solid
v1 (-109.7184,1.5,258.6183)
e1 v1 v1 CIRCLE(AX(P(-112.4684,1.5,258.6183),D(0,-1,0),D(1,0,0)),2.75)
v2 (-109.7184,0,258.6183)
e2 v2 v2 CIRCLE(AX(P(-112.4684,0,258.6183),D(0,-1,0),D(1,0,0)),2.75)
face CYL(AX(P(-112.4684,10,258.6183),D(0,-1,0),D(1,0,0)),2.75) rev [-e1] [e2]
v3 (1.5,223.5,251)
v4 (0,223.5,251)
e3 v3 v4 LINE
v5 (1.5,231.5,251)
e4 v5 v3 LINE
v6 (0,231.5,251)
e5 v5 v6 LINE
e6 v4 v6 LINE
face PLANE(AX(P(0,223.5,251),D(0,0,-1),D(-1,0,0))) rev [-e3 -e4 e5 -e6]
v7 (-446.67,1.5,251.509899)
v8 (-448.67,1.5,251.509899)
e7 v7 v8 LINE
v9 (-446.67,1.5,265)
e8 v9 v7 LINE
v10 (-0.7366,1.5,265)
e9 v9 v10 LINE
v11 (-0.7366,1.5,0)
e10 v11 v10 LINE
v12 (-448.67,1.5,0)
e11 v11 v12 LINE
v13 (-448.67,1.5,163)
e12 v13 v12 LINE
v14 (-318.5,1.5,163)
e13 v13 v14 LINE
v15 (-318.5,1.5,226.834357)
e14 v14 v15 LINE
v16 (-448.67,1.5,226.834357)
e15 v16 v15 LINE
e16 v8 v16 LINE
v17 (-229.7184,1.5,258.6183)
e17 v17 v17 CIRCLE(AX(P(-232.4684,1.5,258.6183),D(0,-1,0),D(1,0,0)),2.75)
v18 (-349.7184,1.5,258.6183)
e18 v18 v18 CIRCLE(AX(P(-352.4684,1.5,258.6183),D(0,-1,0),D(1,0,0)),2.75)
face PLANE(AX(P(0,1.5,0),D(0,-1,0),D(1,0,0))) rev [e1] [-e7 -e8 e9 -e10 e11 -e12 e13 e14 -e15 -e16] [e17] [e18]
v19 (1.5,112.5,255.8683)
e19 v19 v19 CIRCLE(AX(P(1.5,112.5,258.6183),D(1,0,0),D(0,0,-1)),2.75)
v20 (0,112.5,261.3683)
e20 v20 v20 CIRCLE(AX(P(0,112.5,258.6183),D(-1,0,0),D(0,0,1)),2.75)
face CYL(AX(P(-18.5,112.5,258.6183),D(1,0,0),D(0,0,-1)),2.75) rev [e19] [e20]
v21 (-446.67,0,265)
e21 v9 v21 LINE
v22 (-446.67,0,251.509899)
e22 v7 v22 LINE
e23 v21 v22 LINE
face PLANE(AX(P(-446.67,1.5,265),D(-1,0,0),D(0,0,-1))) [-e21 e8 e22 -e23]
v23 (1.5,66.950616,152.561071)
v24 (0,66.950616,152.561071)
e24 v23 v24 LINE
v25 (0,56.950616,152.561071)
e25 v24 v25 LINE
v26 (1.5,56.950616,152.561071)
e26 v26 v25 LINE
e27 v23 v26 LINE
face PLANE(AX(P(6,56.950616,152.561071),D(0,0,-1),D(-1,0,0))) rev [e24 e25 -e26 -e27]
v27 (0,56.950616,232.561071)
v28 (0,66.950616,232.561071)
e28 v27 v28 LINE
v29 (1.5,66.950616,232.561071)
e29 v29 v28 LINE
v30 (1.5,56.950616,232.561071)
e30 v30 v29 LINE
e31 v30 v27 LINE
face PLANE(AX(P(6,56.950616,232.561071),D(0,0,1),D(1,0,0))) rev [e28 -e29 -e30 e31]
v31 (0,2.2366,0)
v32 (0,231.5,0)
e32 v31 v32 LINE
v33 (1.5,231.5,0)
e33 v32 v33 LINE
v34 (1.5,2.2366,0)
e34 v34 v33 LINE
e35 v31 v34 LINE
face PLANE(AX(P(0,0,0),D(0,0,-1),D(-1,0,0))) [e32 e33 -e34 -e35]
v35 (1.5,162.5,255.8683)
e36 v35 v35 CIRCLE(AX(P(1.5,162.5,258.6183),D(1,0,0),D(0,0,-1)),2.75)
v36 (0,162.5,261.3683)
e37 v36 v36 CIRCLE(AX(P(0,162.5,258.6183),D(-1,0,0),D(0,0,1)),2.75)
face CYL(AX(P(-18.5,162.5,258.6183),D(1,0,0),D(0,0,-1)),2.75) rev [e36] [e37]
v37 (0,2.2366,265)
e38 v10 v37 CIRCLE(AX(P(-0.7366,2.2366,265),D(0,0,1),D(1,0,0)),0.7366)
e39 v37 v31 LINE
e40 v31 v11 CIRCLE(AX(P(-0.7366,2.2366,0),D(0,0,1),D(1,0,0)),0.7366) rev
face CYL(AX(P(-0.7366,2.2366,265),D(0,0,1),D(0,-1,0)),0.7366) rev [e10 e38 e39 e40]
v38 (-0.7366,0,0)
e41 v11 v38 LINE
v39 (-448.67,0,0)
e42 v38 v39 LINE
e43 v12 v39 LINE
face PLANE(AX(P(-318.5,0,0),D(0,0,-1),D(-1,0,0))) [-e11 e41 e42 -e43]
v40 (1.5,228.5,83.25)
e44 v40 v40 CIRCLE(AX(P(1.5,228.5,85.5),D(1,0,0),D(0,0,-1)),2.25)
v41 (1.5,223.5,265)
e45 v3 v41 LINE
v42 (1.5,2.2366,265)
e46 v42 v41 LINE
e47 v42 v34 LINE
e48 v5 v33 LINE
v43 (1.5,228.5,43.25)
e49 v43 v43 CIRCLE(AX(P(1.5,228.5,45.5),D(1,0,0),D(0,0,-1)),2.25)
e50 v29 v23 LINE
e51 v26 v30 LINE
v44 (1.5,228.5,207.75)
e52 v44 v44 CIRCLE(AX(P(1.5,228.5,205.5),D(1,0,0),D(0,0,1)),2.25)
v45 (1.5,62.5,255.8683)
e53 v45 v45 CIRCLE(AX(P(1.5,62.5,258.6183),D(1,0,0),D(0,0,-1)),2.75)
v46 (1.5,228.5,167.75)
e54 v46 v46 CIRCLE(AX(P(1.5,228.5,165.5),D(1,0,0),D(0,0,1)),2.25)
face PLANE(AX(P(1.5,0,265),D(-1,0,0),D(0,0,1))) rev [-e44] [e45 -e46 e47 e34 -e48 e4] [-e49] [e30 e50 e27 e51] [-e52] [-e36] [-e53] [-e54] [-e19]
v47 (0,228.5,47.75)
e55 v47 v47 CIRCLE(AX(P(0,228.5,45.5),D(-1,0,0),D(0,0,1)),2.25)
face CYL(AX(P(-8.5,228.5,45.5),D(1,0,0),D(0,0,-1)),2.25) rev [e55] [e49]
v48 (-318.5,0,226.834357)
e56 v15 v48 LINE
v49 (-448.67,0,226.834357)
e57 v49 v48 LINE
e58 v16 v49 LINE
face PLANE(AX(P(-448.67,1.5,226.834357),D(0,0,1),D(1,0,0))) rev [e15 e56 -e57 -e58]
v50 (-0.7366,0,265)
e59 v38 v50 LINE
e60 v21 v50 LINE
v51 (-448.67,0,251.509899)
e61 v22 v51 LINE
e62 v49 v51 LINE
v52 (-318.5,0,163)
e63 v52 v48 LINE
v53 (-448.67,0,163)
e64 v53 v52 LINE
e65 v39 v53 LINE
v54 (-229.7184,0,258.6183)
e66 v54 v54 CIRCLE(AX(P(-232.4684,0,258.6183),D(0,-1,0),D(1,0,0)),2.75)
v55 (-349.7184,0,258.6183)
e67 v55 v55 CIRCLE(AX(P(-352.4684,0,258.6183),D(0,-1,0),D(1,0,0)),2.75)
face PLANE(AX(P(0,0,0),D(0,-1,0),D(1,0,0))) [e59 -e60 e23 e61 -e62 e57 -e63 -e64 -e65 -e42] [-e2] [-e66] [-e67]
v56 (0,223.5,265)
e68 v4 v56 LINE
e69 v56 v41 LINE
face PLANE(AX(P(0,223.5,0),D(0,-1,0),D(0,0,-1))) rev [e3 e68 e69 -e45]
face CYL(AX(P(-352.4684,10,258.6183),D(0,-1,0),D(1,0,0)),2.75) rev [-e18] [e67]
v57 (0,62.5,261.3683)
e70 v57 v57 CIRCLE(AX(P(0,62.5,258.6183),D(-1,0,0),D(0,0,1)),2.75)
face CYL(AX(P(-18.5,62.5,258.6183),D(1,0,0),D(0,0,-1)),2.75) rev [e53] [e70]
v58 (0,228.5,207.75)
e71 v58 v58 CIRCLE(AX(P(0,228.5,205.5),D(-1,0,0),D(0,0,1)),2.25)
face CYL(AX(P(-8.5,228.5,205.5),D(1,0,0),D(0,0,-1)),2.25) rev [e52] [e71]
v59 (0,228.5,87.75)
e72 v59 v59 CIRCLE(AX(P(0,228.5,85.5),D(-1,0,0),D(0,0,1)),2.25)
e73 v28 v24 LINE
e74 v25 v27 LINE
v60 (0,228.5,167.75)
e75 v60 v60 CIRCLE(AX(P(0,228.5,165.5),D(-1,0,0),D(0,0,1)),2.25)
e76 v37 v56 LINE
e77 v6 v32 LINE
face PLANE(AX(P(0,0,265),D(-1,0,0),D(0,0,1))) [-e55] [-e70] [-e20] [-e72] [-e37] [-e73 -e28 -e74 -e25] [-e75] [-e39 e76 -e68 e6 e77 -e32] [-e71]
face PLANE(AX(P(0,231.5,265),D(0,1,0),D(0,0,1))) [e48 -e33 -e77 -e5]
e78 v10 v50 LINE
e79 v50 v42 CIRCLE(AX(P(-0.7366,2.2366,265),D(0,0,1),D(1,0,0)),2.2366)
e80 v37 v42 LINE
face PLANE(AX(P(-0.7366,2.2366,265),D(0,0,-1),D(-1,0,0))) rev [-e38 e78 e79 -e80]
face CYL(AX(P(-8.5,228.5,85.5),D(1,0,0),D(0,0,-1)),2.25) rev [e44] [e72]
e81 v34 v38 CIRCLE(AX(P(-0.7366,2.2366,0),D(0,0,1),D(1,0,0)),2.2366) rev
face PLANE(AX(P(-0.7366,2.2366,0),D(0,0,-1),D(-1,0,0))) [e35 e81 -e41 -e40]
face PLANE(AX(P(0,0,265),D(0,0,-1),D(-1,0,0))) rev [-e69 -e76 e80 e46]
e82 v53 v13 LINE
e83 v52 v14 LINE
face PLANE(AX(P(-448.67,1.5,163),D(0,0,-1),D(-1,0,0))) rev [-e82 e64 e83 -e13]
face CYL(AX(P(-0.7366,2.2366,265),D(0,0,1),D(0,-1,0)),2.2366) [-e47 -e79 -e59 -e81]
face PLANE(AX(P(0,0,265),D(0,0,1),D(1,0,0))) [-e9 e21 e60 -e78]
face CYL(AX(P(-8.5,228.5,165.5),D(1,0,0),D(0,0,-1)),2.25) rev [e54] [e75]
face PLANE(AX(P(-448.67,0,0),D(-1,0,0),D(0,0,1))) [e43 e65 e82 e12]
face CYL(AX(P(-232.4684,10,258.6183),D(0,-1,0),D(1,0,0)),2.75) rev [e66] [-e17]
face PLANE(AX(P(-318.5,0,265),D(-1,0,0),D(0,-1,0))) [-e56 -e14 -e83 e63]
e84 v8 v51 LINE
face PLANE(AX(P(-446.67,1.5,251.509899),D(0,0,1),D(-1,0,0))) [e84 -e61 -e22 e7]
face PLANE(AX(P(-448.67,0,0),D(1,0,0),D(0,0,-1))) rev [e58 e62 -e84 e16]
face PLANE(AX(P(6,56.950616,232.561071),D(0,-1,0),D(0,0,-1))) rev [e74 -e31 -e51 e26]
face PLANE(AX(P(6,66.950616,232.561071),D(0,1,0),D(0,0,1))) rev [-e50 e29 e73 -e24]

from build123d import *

# Parameters (mm, degrees)
SKETCH_2_W                       = 1.5
SKETCH_2_H                       = 231.5
SM_BASE_FLANGE_1_DEPTH           = 265
SKETCH_3_W                       = 2.488275725
SKETCH_3_H                       = 14
CUT_EXTRUDE_1_DEPTH              = 8
SKETCH_4_W                       = 80
SKETCH_4_H                       = 10
CUT_EXTRUDE_2_DEPTH              = 6
SM_EDGE_FLANGE_1_STRIP_W         = 7.4732
SM_EDGE_FLANGE_1_STRIP_H         = 1.5
SM_EDGE_FLANGE_1_STRIP_CUT_DEPTH = 265
SM_EDGE_FLANGE_1_DEPTH           = 265
SKETCH_10_W                      = 163
SKETCH_10_H                      = 1.5
EXTRUDE_1_DEPTH                  = 130.17
SKETCH_11_W                      = 38.16564302
SKETCH_11_H                      = 1.5
EXTRUDE_2_DEPTH                  = 130.17
SKETCH_12_R                      = 2.75
CUT_EXTRUDE_3_DEPTH              = 20
SKETCH_13_R                      = 2.75
CUT_EXTRUDE_4_DEPTH              = 10
SKETCH_14_W                      = 13.490100929
SKETCH_14_H                      = 1.5
CUT_EXTRUDE_5_DEPTH              = 2
SKETCH_15_R                      = 2.25
CUT_EXTRUDE_6_DEPTH              = 10


# Sheet-metal steps are written as plain solids
with BuildPart() as part:
    # Sketch 2 → 基体-法兰1 (new body)
    with BuildSketch(Plane.XY):
        with Locations((0.75, 115.75)):
            Rectangle(SKETCH_2_W, SKETCH_2_H)
    extrude(amount=SM_BASE_FLANGE_1_DEPTH)

    # 草图3 → 切除-拉伸1 (cut)
    with BuildSketch(Plane(origin=(0, 231.5, 0), x_dir=(1, 0, 0), z_dir=(0, 1, 0))):
        with Locations((1.244137863, -258)):
            Rectangle(SKETCH_3_W, SKETCH_3_H)
    extrude(amount=-CUT_EXTRUDE_1_DEPTH, mode=Mode.SUBTRACT)

    # 草图4 → 切除-拉伸2 (cut)
    with BuildSketch(Plane.ZY):
        with Locations((192.56107144, 61.95061584)):
            Rectangle(SKETCH_4_W, SKETCH_4_H)
    extrude(amount=-CUT_EXTRUDE_2_DEPTH, mode=Mode.SUBTRACT)

    # 边线-法兰1 strip (across the edge) → 边线-法兰1 strip cut (cut)
    with BuildSketch(Plane(origin=(0, 0, 0), x_dir=(0, 1, 0), z_dir=(0, 0, 1))):
        with Locations((-1.5, -0.75)):
            Rectangle(SM_EDGE_FLANGE_1_STRIP_W, SM_EDGE_FLANGE_1_STRIP_H)
    extrude(amount=SM_EDGE_FLANGE_1_STRIP_CUT_DEPTH, mode=Mode.SUBTRACT)

    # 边线-法兰1 section (across the edge) → 边线-法兰1 (add)
    with BuildSketch(Plane(origin=(0, 0, 0), x_dir=(0, 1, 0), z_dir=(0, 0, 1))):
        with BuildLine():
            Line((0, 0.7366), (0, 318.5))
            Line((0, 318.5), (1.5, 318.5))
            Line((1.5, 318.5), (1.5, 0.7366))
            ThreePointArc((1.5, 0.7366), (1.715745145, 0.215745145), (2.2366, 0))
            Line((2.2366, 0), (2.2366, -1.5))
            ThreePointArc((2.2366, -1.5), (0.655084973, -0.844915027), (0, 0.7366))
        make_face()
    extrude(amount=SM_EDGE_FLANGE_1_DEPTH)

    # 草图10 → 凸台-拉伸1 (add)
    with BuildSketch(Plane.ZY.offset(318.5)):
        with Locations((81.5, 0.75)):
            Rectangle(SKETCH_10_W, SKETCH_10_H)
    extrude(amount=EXTRUDE_1_DEPTH)

    # 草图11 → 凸台-拉伸2 (add)
    with BuildSketch(Plane.ZY.offset(318.5)):
        with Locations((245.91717849, 0.75)):
            Rectangle(SKETCH_11_W, SKETCH_11_H)
    extrude(amount=EXTRUDE_2_DEPTH)

    # 草图12 → 切除-拉伸3 (cut)
    with BuildSketch(Plane(origin=(1.5, 0, 0), x_dir=(0, 0, -1), z_dir=(1, 0, 0))):
        with Locations((-258.6183, 162.5)):
            Circle(SKETCH_12_R)
        with Locations((-258.6183, 112.5)):
            Circle(SKETCH_12_R)
        with Locations((-258.6183, 62.5)):
            Circle(SKETCH_12_R)
    extrude(amount=-CUT_EXTRUDE_3_DEPTH, mode=Mode.SUBTRACT)

    # 草图13 → 切除-拉伸4 (cut)
    with BuildSketch(Plane.XZ):
        with Locations((-352.4684, 258.6183)):
            Circle(SKETCH_13_R)
        with Locations((-232.4684, 258.6183)):
            Circle(SKETCH_13_R)
        with Locations((-112.4684, 258.6183)):
            Circle(SKETCH_13_R)
    extrude(amount=-CUT_EXTRUDE_4_DEPTH, mode=Mode.SUBTRACT)

    # 草图14 → 切除-拉伸5 (cut)
    with BuildSketch(Plane.ZY.offset(448.67)):
        with Locations((258.254949536, 0.75)):
            Rectangle(SKETCH_14_W, SKETCH_14_H)
    extrude(amount=-CUT_EXTRUDE_5_DEPTH, mode=Mode.SUBTRACT)

    # 草图15 → 切除-拉伸6 (cut)
    with BuildSketch(Plane(origin=(1.5, 0, 0), x_dir=(0, 0, -1), z_dir=(1, 0, 0))):
        with Locations((-45.5, 228.5)):
            Circle(SKETCH_15_R)
        with Locations((-85.5, 228.5)):
            Circle(SKETCH_15_R)
        with Locations(Location((-205.5, 228.5, 0), (0, 0, 180))):
            Circle(SKETCH_15_R)
        with Locations(Location((-165.5, 228.5, 0), (0, 0, 180))):
            Circle(SKETCH_15_R)
    extrude(amount=-CUT_EXTRUDE_6_DEPTH, mode=Mode.SUBTRACT)


solid = part.part
